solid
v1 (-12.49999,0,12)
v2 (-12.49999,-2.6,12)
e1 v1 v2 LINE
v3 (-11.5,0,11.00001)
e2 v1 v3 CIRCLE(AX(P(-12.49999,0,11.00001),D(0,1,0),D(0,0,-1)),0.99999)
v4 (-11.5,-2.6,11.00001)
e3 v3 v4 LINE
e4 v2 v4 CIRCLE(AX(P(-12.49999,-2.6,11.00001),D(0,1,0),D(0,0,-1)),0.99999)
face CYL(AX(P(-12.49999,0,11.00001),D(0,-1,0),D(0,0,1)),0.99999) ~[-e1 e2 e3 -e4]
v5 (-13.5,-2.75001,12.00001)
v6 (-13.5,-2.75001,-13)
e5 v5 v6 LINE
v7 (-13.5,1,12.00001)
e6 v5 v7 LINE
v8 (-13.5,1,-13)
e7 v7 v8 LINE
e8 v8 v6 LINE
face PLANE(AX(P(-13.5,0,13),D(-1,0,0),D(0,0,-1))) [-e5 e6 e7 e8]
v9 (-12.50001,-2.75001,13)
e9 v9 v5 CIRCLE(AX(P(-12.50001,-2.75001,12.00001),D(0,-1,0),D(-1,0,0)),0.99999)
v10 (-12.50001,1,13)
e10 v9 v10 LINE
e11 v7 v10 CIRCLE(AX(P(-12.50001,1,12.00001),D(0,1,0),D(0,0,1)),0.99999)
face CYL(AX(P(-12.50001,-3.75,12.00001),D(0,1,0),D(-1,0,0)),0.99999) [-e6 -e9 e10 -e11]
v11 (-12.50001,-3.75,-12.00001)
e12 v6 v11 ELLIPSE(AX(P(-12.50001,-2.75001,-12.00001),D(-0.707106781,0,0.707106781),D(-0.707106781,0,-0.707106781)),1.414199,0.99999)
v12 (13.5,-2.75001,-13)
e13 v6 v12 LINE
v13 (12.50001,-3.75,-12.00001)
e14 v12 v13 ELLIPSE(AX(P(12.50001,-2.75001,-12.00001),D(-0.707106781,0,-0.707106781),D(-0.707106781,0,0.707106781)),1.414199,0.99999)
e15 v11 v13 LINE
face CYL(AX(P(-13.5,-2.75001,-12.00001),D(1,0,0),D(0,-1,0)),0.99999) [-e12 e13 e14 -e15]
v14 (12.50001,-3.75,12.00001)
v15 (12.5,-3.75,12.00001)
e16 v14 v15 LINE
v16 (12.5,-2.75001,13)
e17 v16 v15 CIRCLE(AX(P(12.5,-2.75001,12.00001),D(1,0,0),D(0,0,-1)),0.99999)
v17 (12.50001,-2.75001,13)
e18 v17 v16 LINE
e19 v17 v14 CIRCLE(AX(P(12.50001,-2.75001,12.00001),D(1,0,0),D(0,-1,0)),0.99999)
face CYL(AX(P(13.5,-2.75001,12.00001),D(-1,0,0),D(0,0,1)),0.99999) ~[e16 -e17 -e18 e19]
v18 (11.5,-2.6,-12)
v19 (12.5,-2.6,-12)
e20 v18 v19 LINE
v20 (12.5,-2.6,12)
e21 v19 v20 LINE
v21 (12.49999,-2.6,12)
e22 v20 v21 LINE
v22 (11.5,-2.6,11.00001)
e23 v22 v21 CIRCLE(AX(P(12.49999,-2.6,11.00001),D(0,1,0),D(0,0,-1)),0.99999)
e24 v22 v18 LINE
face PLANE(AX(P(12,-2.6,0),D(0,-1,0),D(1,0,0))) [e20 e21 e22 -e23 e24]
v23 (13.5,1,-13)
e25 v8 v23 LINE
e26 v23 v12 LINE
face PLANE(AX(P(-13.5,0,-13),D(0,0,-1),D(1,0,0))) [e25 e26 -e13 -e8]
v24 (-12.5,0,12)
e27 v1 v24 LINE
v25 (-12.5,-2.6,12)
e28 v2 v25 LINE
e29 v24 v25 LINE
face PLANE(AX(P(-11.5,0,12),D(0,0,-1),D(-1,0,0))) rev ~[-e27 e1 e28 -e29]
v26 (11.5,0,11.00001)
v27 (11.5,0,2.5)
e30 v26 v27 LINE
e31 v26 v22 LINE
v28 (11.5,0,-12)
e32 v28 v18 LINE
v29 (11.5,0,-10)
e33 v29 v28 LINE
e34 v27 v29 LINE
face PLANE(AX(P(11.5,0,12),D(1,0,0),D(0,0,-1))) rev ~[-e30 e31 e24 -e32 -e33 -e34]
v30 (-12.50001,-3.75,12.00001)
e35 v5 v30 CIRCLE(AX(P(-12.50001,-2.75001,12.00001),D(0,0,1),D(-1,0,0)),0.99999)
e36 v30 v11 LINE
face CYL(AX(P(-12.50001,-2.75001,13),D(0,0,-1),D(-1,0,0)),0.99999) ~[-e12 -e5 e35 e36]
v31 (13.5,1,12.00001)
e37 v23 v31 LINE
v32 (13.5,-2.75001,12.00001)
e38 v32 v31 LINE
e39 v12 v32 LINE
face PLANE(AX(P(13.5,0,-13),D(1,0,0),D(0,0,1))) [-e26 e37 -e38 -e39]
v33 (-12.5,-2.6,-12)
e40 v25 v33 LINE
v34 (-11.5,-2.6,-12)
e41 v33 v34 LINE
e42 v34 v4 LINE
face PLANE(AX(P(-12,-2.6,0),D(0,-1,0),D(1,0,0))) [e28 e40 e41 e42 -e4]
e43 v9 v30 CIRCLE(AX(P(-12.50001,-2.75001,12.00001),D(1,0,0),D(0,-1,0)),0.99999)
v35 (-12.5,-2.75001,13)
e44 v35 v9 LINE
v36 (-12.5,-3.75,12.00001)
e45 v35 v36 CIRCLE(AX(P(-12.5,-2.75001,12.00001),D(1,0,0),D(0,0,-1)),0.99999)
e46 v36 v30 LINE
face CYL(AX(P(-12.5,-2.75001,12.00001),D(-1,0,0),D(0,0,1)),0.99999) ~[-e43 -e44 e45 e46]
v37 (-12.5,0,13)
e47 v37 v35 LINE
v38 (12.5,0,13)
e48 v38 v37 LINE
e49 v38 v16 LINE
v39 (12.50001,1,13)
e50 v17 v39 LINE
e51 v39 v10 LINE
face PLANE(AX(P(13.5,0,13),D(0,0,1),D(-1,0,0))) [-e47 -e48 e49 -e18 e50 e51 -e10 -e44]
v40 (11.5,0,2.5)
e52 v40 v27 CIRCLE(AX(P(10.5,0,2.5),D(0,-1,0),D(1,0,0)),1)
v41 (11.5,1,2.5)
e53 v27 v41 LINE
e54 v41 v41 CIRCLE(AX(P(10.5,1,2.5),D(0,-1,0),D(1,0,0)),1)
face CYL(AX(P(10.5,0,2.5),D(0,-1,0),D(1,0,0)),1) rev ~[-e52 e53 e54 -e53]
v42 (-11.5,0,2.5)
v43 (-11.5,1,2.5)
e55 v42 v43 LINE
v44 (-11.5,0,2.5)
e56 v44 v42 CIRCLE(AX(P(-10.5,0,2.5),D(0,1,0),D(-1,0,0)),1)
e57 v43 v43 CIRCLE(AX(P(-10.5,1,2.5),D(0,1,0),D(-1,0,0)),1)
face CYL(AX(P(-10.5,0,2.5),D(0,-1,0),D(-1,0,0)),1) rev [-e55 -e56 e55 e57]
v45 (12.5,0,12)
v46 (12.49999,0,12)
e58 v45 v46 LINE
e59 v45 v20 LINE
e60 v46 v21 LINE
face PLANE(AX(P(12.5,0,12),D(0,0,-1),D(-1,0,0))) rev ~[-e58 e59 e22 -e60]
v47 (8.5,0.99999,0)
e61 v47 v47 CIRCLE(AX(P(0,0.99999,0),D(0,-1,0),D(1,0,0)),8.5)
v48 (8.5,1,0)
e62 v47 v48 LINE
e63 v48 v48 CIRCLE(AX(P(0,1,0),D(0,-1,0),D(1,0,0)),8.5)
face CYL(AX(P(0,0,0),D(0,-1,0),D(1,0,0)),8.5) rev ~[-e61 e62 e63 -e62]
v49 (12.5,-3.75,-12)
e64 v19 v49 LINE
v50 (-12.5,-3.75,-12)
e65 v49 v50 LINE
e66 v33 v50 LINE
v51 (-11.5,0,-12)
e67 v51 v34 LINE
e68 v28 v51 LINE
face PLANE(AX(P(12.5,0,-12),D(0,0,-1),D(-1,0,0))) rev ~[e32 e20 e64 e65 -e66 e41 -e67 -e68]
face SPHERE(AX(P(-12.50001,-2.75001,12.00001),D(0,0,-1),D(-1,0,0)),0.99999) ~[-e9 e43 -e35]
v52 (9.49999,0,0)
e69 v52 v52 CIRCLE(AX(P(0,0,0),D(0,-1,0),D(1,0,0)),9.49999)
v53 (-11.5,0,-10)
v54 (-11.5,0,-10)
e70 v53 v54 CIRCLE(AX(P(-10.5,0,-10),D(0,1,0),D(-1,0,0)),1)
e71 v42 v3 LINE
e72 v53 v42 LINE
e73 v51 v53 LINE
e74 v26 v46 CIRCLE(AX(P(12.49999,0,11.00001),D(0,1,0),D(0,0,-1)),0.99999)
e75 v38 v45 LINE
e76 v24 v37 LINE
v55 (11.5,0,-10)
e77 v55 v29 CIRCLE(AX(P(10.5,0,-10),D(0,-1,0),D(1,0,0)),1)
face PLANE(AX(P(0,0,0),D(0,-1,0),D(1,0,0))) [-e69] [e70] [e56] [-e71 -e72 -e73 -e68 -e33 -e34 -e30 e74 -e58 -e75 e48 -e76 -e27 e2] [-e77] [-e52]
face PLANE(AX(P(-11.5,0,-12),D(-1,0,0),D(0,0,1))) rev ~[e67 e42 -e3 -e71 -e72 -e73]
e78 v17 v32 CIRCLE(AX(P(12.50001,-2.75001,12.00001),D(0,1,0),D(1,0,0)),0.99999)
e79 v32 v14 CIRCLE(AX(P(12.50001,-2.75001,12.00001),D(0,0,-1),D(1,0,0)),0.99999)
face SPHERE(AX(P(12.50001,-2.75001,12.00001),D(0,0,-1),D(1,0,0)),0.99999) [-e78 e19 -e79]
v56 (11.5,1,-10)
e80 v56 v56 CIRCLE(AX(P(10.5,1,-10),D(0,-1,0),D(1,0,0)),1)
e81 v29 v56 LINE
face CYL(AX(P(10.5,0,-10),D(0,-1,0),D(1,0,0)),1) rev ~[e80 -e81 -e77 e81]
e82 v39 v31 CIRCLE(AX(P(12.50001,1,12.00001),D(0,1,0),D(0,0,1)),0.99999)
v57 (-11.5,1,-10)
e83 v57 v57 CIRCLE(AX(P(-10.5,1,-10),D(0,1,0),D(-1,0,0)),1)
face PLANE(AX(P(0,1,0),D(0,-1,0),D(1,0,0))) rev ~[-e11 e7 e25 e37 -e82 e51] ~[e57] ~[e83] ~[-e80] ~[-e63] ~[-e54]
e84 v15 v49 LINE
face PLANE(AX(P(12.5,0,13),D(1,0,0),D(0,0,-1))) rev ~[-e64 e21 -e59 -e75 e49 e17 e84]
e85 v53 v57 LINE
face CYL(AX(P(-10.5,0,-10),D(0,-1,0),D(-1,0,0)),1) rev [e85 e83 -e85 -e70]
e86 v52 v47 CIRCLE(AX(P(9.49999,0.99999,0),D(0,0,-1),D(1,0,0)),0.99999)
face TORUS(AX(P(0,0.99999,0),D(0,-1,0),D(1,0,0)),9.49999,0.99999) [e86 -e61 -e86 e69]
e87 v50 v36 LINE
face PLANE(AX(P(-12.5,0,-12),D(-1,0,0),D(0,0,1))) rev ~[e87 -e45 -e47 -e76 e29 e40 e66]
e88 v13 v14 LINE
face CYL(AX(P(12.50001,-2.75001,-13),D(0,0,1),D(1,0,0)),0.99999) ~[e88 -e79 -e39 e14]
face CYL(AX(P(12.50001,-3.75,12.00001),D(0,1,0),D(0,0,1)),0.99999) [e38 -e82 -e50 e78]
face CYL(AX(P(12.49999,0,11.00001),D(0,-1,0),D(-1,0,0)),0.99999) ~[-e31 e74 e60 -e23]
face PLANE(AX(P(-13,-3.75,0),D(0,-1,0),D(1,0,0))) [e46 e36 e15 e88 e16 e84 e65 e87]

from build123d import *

# Parameters (mm, degrees)
F0_W     = 23
F0_H     = 1
F0_W_2   = 1
F1_DEPTH = 3.75
F2_DEPTH = 2.6
F0_R     = 1
F0_R_2   = 8.5
F3_DEPTH = 1
F4_R     = 0.99999


# Not quite as in the source:
# - a fillet or chamfer is up to 0.001 mm smaller than in the source, because OpenCascade refuses the exact size


with BuildPart() as f1:
    # F0 (on Front) → F1 (new body)
    with BuildSketch(Plane.XZ):
        Polygon((-12.5, -13), (-12.5, -12), (-12.5, 12), (-12.5, 13), (-13.5, 13), (-13.5, -13), align=None)
        Polygon((12.5, 12), (12.5, -12), (12.5, -13), (13.5, -13), (13.5, 13), (12.5, 13), align=None)
        with Locations((0, -12.5)):
            Rectangle(F0_W, F0_H)
        with Locations((-12, -12.5)):
            Rectangle(F0_W_2, F0_H)
        with Locations((12, -12.5)):
            Rectangle(F0_W_2, F0_H)
    extrude(amount=F1_DEPTH)

    # F0 (on Front) → F2 (join)
    with BuildSketch(Plane.XZ):
        Polygon((-12.5, -12), (-11.5, -12), (-11.5, -10), (-11.5, 2.5), (-11.5, 12), (-12.5, 12), align=None)
        Polygon((11.5, -12), (12.5, -12), (12.5, 12), (11.5, 12), (11.5, 2.5), (11.5, -10), align=None)
    extrude(amount=F2_DEPTH)

    # F0 (on Front) → F3 (join)
    with BuildSketch(Plane.XZ):
        Polygon((-11.5, -12), (11.5, -12), (11.5, -10), (11.5, 2.5), (11.5, 12), (-11.5, 12), (-11.5, 2.5), (-11.5, -10), align=None)
        with BuildLine():
            ThreePointArc((-9.5, -10), (-10.5, -11), (-11.5, -10))
            ThreePointArc((-11.5, -10), (-10.5, -9), (-9.5, -10))
        make_face(mode=Mode.SUBTRACT)
        with Locations((10.5, -10)):
            Circle(F0_R, mode=Mode.SUBTRACT)
        with BuildLine():
            ThreePointArc((-9.5, 2.5), (-10.5, 1.5), (-11.5, 2.5))
            ThreePointArc((-11.5, 2.5), (-10.5, 3.5), (-9.5, 2.5))
        make_face(mode=Mode.SUBTRACT)
        Circle(F0_R_2, mode=Mode.SUBTRACT)
        with Locations((10.5, 2.5)):
            Circle(F0_R, mode=Mode.SUBTRACT)
        with Locations((0, 12.5)):
            Rectangle(F0_W, F0_H)
        Polygon((-12.5, -13), (-12.5, -12), (-12.5, 12), (-12.5, 13), (-13.5, 13), (-13.5, -13), align=None)
        Polygon((-12.5, -12), (-11.5, -12), (-11.5, -10), (-11.5, 2.5), (-11.5, 12), (-12.5, 12), align=None)
        with Locations((-12, 12.5)):
            Rectangle(F0_W_2, F0_H)
        with Locations((-12, -12.5)):
            Rectangle(F0_W_2, F0_H)
        with Locations((0, -12.5)):
            Rectangle(F0_W, F0_H)
        with Locations((12, -12.5)):
            Rectangle(F0_W_2, F0_H)
        Polygon((11.5, -12), (12.5, -12), (12.5, 12), (11.5, 12), (11.5, 2.5), (11.5, -10), align=None)
        Polygon((12.5, 12), (12.5, -12), (12.5, -13), (13.5, -13), (13.5, 13), (12.5, 13), align=None)
        with Locations((12, 12.5)):
            Rectangle(F0_W_2, F0_H)
    extrude(amount=-F3_DEPTH)

    # F4 (radius 1 in the source; OpenCascade refuses exactly that, so slightly less here)
    f4_edges = [f1.edges().sort_by_distance(p)[0] for p in [
        (-13.5, -3.75, 0),
        (13.5, -3.75, 0),
        (0, -3.75, -13),
        (-13.5, -1.375, 13),
        (13.5, -1.375, 13),
        (-13, -3.75, 13),
        (13, -3.75, 13),
        (11.5, -1.3, 12),
        (-11.5, -1.3, 12),
        (-8.5, 0, 0),
    ]]
    fillet(f4_edges, radius=F4_R)


solid = f1.part
